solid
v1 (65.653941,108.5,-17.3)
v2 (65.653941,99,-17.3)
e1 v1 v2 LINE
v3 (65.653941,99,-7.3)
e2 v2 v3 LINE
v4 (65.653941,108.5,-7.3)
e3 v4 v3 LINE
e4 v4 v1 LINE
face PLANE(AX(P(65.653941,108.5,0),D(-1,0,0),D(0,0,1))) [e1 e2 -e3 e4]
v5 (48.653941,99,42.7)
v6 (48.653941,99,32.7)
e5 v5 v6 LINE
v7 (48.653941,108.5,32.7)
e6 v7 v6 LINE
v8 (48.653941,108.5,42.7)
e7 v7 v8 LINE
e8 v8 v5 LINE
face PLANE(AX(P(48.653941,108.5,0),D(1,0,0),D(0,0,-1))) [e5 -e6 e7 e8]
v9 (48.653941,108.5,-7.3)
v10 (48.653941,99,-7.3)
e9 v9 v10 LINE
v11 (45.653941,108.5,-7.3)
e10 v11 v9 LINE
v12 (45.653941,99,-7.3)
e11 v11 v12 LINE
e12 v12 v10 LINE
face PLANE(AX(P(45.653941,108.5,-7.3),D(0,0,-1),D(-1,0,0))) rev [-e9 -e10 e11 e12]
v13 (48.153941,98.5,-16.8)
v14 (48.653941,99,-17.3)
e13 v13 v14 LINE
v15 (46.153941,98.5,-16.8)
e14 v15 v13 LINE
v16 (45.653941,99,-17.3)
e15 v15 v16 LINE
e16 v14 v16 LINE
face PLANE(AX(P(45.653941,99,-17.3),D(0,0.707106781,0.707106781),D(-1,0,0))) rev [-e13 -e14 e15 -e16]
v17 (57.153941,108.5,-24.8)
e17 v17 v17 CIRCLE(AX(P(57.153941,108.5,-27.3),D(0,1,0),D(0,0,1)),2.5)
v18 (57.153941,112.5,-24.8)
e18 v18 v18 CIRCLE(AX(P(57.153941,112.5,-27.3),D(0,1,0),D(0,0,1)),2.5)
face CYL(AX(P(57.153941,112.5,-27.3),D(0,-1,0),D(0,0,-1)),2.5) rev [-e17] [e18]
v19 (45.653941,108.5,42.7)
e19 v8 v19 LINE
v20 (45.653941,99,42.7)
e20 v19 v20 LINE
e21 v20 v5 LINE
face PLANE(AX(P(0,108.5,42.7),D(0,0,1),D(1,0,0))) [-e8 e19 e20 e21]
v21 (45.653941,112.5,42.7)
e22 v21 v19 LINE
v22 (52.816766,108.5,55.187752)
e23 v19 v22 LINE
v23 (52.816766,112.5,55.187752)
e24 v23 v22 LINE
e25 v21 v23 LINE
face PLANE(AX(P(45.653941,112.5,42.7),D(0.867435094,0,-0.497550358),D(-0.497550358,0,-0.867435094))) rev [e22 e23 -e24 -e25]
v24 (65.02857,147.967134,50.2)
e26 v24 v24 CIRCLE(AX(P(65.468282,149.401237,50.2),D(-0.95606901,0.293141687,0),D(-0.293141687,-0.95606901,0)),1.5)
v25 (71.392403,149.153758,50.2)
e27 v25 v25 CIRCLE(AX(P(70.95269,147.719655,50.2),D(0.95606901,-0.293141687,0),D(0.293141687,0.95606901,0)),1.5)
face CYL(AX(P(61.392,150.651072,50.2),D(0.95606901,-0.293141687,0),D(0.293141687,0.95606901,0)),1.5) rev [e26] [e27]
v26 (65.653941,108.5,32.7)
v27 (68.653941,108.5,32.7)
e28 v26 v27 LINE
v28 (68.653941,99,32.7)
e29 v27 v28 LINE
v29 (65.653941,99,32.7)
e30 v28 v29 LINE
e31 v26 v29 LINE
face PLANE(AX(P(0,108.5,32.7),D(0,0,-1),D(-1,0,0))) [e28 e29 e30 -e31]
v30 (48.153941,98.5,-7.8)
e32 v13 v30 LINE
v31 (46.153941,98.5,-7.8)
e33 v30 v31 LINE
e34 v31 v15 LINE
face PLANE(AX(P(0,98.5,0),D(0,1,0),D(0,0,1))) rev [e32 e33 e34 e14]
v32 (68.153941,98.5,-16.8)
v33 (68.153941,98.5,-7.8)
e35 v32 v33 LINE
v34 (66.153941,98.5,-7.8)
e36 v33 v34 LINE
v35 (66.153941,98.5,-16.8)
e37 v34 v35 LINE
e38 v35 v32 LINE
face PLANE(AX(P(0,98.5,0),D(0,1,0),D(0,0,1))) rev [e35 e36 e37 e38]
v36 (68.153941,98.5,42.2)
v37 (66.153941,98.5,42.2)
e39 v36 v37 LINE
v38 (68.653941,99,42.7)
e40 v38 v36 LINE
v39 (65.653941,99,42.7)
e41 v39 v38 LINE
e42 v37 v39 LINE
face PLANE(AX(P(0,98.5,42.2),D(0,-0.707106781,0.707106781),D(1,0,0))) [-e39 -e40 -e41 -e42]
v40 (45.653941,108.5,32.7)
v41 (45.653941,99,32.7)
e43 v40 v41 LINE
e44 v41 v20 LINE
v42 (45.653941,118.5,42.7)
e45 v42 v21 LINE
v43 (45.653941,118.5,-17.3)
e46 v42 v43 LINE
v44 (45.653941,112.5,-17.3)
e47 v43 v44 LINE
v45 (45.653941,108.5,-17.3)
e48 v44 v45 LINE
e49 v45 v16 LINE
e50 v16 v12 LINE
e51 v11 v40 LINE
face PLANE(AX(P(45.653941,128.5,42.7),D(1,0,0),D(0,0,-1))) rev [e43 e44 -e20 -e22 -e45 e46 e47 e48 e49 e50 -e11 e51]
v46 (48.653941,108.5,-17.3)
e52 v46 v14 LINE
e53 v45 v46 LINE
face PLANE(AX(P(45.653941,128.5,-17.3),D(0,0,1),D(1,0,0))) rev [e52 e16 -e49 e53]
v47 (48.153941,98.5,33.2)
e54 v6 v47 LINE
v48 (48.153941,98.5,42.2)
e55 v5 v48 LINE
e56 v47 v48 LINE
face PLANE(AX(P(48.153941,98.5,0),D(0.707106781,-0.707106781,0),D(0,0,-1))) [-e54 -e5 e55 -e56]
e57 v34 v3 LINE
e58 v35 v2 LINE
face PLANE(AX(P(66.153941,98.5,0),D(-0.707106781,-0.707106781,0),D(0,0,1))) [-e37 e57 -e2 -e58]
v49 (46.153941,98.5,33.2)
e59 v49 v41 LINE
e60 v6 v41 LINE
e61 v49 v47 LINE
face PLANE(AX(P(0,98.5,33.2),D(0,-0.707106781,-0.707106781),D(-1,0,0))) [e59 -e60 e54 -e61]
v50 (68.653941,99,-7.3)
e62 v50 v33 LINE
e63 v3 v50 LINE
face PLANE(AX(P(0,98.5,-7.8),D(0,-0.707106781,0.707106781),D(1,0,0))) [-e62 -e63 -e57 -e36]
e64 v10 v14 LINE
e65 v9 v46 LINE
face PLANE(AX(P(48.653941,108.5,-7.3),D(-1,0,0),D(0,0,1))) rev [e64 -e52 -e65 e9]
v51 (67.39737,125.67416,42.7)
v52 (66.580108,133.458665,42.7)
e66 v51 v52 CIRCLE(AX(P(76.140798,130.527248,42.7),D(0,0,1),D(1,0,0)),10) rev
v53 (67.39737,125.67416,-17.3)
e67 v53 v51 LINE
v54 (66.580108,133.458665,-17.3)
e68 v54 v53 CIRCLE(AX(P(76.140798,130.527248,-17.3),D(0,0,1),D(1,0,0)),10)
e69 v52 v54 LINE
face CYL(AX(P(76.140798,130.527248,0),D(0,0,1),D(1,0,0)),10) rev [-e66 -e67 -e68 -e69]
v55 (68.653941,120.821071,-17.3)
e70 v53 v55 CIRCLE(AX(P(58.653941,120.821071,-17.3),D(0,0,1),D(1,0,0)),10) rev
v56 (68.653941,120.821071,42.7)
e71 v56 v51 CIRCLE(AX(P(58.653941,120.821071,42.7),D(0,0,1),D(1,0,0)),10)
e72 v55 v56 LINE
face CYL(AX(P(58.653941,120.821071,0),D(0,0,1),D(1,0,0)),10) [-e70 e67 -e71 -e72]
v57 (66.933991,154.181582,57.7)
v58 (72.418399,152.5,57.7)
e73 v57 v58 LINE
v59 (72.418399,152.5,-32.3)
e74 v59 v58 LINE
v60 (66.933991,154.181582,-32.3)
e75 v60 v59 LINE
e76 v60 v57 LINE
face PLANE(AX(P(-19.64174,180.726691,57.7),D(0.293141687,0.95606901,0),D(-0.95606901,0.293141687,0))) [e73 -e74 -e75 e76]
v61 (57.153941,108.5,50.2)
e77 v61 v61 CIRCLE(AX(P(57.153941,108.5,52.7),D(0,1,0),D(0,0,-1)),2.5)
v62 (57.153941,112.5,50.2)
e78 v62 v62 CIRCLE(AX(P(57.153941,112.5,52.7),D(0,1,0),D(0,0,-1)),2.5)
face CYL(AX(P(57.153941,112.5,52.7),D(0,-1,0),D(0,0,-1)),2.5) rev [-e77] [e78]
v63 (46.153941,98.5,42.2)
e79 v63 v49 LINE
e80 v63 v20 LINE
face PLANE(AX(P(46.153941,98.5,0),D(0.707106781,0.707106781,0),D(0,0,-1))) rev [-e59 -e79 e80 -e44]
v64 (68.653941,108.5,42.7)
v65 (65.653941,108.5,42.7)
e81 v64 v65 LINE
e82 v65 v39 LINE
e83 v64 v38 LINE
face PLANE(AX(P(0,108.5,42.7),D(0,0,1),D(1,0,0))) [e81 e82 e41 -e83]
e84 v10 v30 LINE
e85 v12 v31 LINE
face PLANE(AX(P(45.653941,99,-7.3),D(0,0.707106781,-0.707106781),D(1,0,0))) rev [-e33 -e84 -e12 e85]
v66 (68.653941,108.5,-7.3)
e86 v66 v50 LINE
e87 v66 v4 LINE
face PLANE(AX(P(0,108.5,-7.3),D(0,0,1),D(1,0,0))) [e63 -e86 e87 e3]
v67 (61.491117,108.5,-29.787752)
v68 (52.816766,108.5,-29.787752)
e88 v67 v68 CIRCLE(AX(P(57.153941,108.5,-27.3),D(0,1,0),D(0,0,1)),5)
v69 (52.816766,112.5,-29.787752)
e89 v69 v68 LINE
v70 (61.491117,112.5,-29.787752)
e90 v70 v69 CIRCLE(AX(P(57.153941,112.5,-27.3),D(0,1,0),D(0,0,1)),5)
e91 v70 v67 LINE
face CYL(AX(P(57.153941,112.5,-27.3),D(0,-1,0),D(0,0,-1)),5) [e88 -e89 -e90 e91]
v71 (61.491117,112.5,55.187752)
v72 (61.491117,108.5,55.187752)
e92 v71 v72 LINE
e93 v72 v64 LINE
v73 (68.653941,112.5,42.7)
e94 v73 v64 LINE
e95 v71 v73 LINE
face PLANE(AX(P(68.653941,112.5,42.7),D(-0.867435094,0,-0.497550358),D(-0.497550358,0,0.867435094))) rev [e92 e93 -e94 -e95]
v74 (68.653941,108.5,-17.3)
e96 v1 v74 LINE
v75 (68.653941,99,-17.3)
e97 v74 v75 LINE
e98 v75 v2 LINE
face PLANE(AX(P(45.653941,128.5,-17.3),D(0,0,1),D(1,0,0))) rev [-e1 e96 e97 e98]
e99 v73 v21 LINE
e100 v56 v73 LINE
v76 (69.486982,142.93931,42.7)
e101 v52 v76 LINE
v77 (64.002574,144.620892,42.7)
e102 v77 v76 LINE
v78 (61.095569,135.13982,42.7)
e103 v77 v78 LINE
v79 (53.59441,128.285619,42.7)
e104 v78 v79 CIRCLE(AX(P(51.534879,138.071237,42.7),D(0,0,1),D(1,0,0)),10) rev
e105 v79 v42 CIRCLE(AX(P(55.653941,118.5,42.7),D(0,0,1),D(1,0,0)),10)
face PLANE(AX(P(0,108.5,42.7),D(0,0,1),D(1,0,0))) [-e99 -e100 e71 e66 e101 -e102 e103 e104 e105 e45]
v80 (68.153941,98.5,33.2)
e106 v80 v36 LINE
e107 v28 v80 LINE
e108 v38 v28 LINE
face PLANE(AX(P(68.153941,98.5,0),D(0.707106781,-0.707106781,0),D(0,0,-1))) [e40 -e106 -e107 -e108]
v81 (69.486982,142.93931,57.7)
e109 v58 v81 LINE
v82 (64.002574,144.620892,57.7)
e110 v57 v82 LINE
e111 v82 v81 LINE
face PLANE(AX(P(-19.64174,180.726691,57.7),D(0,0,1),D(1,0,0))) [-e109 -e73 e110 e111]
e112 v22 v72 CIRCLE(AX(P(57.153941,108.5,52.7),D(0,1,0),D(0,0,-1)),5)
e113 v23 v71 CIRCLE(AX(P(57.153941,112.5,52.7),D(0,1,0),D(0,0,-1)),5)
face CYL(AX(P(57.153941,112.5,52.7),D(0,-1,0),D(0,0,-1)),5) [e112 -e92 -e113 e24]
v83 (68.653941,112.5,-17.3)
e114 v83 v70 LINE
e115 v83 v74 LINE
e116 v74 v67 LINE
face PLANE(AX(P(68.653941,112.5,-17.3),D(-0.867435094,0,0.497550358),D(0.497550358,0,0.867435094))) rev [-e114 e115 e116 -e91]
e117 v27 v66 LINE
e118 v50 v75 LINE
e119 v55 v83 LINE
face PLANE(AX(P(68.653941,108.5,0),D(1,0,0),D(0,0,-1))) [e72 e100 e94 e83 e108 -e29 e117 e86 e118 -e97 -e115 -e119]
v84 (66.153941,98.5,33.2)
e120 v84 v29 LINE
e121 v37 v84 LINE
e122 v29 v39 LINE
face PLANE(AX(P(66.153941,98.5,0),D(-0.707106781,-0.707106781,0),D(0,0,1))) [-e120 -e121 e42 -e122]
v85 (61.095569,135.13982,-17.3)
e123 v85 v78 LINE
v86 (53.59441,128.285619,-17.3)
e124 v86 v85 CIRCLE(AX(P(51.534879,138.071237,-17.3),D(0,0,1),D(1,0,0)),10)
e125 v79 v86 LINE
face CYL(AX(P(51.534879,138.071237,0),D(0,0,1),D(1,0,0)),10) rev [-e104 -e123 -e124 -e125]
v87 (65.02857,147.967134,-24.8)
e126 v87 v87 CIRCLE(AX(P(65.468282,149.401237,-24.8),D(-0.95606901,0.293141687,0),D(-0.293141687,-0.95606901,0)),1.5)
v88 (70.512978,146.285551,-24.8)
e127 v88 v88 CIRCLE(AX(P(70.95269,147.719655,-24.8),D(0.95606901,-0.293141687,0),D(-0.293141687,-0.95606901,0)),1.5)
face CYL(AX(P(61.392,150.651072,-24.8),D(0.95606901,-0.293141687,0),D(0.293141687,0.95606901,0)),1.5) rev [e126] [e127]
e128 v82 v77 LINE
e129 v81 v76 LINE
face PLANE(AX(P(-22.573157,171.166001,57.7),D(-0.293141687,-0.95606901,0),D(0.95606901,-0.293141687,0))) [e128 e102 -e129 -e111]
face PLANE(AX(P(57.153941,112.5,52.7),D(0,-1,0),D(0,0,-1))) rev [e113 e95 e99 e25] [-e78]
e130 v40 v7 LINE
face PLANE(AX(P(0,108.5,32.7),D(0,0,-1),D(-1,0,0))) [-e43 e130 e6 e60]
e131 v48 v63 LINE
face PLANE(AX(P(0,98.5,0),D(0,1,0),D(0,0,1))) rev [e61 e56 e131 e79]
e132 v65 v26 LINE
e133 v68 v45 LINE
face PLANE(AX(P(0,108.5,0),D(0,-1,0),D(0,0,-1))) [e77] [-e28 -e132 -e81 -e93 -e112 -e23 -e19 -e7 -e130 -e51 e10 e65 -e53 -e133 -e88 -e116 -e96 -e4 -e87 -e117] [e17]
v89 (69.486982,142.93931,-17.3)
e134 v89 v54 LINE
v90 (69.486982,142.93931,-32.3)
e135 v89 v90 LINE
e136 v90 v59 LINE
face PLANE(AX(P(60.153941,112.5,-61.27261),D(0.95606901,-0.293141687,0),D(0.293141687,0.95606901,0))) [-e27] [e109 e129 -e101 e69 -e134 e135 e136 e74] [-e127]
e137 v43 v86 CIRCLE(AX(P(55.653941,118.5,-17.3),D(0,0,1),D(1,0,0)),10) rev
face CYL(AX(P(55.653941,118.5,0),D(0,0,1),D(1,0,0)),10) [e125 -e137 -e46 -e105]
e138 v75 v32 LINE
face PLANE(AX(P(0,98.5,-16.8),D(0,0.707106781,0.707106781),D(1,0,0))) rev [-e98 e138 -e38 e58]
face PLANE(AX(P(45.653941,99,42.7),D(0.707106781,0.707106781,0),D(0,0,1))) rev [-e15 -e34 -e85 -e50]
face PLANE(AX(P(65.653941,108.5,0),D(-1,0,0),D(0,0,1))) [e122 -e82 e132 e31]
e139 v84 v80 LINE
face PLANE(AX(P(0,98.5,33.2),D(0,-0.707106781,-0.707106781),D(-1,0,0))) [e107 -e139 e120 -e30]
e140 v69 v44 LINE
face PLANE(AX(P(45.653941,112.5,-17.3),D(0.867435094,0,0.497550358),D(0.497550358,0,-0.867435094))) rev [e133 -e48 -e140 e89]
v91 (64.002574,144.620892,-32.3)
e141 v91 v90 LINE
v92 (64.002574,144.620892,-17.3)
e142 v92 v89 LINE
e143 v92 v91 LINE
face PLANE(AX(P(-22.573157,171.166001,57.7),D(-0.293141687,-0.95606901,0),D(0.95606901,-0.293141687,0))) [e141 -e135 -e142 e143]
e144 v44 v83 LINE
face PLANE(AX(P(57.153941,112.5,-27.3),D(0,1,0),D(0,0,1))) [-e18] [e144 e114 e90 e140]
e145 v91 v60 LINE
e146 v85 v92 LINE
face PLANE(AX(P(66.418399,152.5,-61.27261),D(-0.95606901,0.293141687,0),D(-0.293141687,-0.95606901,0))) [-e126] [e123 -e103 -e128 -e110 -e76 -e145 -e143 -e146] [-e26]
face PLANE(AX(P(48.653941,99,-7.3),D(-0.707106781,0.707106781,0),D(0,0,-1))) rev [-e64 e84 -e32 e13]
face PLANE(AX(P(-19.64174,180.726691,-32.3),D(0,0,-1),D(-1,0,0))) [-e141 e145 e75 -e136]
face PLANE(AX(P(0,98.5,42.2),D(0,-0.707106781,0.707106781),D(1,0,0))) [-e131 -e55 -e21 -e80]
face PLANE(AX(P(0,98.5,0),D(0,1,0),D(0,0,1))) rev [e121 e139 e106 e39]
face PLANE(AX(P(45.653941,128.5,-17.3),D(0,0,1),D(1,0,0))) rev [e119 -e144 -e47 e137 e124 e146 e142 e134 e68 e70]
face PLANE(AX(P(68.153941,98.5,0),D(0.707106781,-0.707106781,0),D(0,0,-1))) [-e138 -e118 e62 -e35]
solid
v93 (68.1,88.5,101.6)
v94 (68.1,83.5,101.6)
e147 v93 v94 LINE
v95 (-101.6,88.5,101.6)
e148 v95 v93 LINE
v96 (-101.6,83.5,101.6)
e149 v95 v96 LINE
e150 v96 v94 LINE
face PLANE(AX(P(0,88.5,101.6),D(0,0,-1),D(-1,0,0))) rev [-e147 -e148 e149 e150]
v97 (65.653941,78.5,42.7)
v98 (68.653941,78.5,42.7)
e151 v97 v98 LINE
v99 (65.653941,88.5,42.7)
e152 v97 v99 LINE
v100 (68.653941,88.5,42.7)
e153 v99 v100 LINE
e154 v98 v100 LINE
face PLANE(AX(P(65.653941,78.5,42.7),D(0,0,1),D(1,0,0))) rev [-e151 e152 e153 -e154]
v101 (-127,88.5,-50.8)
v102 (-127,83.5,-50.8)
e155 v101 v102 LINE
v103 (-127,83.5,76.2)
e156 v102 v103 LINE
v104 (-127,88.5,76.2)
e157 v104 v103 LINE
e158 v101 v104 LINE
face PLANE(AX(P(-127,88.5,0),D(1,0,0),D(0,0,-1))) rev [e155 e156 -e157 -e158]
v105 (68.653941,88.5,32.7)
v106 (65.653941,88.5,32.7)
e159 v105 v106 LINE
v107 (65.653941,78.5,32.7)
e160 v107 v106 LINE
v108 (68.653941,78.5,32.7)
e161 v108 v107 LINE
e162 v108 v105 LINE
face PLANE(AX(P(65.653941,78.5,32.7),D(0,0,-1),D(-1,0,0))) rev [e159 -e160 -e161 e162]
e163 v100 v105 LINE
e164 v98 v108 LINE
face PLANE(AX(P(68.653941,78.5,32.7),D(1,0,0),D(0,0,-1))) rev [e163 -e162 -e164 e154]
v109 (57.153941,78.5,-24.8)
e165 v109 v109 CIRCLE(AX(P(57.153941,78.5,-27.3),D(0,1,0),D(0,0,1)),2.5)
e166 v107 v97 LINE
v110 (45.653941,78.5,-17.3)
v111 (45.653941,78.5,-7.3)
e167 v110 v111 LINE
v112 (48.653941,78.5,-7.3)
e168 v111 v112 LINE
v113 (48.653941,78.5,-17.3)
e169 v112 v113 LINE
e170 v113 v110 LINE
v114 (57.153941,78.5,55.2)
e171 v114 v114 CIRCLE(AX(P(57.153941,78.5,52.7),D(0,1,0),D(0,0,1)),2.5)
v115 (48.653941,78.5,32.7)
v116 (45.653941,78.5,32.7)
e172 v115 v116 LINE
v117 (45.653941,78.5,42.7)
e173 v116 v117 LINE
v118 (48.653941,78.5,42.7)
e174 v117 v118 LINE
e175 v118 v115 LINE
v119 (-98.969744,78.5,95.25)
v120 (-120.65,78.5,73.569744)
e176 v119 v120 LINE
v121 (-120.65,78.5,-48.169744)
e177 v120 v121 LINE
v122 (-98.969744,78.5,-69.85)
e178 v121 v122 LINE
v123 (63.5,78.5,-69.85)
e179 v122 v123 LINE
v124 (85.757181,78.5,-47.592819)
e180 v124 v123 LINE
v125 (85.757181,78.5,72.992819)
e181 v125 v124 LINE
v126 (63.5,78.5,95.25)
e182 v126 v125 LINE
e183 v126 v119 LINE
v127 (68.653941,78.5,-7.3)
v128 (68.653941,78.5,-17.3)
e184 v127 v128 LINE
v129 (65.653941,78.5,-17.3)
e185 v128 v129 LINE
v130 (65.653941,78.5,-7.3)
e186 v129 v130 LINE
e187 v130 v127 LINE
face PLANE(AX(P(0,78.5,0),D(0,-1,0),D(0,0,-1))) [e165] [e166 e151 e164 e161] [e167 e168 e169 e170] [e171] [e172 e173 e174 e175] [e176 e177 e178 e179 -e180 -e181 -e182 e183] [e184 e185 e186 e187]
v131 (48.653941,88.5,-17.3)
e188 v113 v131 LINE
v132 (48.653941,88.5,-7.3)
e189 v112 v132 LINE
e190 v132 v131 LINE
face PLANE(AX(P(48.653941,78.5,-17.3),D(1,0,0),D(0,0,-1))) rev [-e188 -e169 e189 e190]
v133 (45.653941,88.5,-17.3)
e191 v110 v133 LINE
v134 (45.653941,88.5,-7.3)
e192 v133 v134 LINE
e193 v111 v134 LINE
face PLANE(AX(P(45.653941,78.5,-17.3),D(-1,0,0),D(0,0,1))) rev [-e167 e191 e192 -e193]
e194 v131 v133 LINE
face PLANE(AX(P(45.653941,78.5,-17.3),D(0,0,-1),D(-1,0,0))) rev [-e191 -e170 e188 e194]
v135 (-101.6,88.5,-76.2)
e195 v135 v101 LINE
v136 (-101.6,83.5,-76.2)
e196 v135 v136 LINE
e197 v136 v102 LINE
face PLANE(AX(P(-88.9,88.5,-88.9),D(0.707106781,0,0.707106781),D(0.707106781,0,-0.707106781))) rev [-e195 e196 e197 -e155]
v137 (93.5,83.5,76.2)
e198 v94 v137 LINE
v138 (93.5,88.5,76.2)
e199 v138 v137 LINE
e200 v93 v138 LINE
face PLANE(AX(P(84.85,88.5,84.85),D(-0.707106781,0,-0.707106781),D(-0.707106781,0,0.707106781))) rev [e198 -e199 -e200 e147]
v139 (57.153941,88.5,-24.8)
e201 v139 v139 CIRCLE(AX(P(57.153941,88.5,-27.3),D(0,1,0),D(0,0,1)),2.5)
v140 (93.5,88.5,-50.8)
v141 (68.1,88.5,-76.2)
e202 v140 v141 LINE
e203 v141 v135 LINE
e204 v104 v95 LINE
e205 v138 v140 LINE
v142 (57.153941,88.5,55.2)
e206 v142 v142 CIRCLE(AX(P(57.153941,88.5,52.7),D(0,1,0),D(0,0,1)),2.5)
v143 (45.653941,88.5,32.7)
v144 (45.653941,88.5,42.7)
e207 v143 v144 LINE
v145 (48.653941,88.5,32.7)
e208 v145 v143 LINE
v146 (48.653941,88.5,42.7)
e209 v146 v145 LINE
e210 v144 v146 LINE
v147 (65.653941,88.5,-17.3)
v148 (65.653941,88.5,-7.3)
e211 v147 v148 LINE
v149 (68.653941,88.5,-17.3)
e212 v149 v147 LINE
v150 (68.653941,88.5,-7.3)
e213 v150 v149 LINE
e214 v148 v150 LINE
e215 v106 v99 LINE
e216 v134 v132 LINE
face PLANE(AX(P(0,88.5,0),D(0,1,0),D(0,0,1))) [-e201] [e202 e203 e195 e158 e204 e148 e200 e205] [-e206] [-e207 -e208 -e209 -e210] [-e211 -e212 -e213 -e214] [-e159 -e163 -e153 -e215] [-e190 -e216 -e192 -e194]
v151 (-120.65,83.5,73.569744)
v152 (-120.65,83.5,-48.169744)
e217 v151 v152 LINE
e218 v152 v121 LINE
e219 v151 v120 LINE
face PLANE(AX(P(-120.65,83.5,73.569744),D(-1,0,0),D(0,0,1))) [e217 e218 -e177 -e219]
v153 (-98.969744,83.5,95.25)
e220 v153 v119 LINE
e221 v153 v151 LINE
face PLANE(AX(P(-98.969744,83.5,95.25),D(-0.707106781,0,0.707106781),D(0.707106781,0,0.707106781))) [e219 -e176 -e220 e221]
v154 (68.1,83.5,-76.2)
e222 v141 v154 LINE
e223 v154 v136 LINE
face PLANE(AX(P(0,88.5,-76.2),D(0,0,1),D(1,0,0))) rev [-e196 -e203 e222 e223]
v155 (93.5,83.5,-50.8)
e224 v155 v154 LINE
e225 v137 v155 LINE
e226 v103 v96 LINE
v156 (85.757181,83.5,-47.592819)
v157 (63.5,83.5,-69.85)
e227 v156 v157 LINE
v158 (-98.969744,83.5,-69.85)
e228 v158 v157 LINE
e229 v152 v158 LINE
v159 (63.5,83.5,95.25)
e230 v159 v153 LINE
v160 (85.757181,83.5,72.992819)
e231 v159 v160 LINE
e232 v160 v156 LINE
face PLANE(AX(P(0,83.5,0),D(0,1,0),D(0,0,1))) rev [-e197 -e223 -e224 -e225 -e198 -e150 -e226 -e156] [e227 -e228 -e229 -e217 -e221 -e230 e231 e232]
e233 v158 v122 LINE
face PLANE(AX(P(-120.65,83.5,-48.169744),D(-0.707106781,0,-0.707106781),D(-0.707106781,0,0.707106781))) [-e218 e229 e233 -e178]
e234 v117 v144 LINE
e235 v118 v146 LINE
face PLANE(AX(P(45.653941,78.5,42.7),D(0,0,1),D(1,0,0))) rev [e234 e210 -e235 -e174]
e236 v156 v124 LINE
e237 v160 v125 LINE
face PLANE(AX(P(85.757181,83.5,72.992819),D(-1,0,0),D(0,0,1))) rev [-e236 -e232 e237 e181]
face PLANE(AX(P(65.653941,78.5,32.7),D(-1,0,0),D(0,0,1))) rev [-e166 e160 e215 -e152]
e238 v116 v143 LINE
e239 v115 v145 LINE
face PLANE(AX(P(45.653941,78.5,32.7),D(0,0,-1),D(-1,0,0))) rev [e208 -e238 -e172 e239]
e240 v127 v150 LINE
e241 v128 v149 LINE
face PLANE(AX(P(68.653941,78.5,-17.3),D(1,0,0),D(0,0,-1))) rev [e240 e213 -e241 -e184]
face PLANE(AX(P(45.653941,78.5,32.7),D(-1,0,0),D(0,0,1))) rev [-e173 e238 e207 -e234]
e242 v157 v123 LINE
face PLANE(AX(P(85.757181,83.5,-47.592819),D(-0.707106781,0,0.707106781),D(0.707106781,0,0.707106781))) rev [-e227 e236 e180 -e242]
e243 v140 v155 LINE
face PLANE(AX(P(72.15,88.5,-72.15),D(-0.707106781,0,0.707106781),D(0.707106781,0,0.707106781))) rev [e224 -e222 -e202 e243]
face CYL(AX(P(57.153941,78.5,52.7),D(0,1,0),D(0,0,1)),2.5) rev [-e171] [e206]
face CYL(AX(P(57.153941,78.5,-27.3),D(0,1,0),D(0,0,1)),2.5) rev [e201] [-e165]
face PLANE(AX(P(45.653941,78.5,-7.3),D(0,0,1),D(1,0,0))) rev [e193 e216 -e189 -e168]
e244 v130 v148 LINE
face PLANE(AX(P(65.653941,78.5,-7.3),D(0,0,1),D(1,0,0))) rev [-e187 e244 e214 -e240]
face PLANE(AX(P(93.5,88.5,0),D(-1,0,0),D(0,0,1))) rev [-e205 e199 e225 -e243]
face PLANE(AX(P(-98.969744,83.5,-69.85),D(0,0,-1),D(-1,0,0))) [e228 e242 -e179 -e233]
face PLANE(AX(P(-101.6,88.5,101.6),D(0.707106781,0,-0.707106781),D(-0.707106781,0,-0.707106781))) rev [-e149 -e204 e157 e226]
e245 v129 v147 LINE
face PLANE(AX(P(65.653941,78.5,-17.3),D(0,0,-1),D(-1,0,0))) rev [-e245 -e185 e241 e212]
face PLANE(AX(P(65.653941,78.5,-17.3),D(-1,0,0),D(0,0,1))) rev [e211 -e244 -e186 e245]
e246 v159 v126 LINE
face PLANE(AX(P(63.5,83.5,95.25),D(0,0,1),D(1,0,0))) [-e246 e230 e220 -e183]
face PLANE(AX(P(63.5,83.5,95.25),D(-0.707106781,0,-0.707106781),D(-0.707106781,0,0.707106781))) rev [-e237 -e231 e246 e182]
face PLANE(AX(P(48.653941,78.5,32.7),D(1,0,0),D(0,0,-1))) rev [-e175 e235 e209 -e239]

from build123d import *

# Parameters (mm, degrees)
SKETCH2_W               = 190.5
SKETCH2_H               = 177.8
BOSS_EXTRUDE1_DEPTH     = 5.08
CHAMFER1_SIZE           = 25.4
BOSS_EXTRUDE3_DEPTH     = 68.42
SKETCH5_R               = 9
SKETCH5_R_2             = 1.5
CUT_EXTRUDE1_DEPTH      = 231.530019737
SKETCH10_W              = 177.8
SKETCH10_H              = 73.5
BOSS_EXTRUDE6_DEPTH     = 30
CHAMFER3_SIZE           = 25.4
CUT_EXTRUDE2_DEPTH      = 68.42
BOSS_EXTRUDE7_START     = 38.1
BOSS_EXTRUDE7_DEPTH     = 10
SKETCH13_W              = 15.24
SKETCH13_H              = 10
BOSS_EXTRUDE8_DEPTH     = 7
SKETCH14_R              = 2.5
CUT_EXTRUDE3_DEPTH      = 10
MIRROR4_COPY_1_SKETCH_W = 15.24
MIRROR4_COPY_1_SKETCH_H = 10
MIRROR4_COPY_1_DEPTH    = 7
MIRROR4_COPY_2_SKETCH_R = 2.5
MIRROR4_COPY_2_DEPTH    = 10
BOSS_EXTRUDE9_START     = 5
BOSS_EXTRUDE9_DEPTH     = 5
BOSS_EXTRUDE10_START    = 10
BOSS_EXTRUDE10_DEPTH    = 5
SKETCH16_R              = 2.5
CUT_EXTRUDE4_DEPTH      = 163.946494286
SKETCH17_W              = 3
SKETCH17_H              = 10
CUT_EXTRUDE5_DEPTH      = 163.946494286
BOSS_EXTRUDE11_START    = 10
SKETCH18_W              = 3
SKETCH18_H              = 10
BOSS_EXTRUDE11_DEPTH    = 10
BOSS_EXTRUDE11_2_DEPTH  = 10
BOSS_EXTRUDE11_3_DEPTH  = 10
BOSS_EXTRUDE11_4_DEPTH  = 10
SKETCH19_W              = 23
SKETCH19_H              = 60
BOSS_EXTRUDE12_DEPTH    = 20
BOSS_EXTRUDE13_START    = -20
SKETCH20_R              = 2.5
BOSS_EXTRUDE13_DEPTH    = 4
BOSS_EXTRUDE16_DEPTH    = 60
FILLET1_R               = 10
SKETCH24_W              = 90
SKETCH24_H              = 10
BOSS_EXTRUDE17_DEPTH    = 5.736414059
SKETCH25_R              = 1.5
CUT_EXTRUDE7_DEPTH      = 10
FILLET2_R               = 10
FILLET3_R               = 10
FILLET4_R               = 10
CHAMFER4_SIZE           = 0.5


with BuildPart() as part:
    # Sketch2 → Boss-Extrude1 (new body)
    with BuildSketch(Plane(origin=(0, 0, 0), x_dir=(1, 0, 0), z_dir=(0, 1, 0))):
        with Locations((-31.75, -12.7)):
            Rectangle(SKETCH2_W, SKETCH2_H)
    extrude(amount=BOSS_EXTRUDE1_DEPTH)

    # Chamfer1
    chamfer1_edges = [part.edges().sort_by_distance(p)[0] for p in [
        (-127, 2.54, -76.2),
        (-127, 2.54, 101.6),
    ]]
    chamfer(chamfer1_edges, length=CHAMFER1_SIZE)

    # Sketch4 → Boss-Extrude3 (add)
    with BuildSketch(Plane(origin=(0, 5.08, 0), x_dir=(1, 0, 0), z_dir=(0, 1, 0))):
        Polygon((57.15, 69.85), (-98.969743879, 69.85), (-120.65, 48.169743879), (-120.65, -73.569743879), (-98.969743879, -95.25), (57.15, -95.25), (63.5, -95.25), (63.5, -101.6), (-101.6, -101.6), (-127, -76.2), (-127, 50.8), (-101.6, 76.2), (63.5, 76.2), (63.5, 69.85), align=None)
    extrude(amount=BOSS_EXTRUDE3_DEPTH)

    # Sketch5 → Cut-Extrude1 (cut, through all)
    with BuildSketch(Plane.XY.offset(101.6)):
        with Locations((-50.8, 31.75)):
            Circle(SKETCH5_R)
        with Locations((-50.8, 47.25)):
            Circle(SKETCH5_R_2)
        with Locations((-37.376606241, 39.5)):
            Circle(SKETCH5_R_2)
        with Locations((-37.376606241, 24)):
            Circle(SKETCH5_R_2)
        with Locations((-50.8, 16.25)):
            Circle(SKETCH5_R_2)
        with Locations((-64.223393759, 24)):
            Circle(SKETCH5_R_2)
        with Locations((-64.223393759, 39.5)):
            Circle(SKETCH5_R_2)
    extrude(amount=-CUT_EXTRUDE1_DEPTH, mode=Mode.SUBTRACT)

    # Sketch10 → Boss-Extrude6 (add)
    with BuildSketch(Plane(origin=(63.5, 0, 0), x_dir=(0, 0, -1), z_dir=(1, 0, 0))):
        with Locations((-12.7, 36.75)):
            Rectangle(SKETCH10_W, SKETCH10_H)
    extrude(amount=BOSS_EXTRUDE6_DEPTH)

    # Chamfer3
    chamfer3_edges = [part.edges().sort_by_distance(p)[0] for p in [
        (93.5, 36.75, 101.6),
        (93.5, 36.75, -76.2),
    ]]
    chamfer(chamfer3_edges, length=CHAMFER3_SIZE)

    # Sketch11 → Cut-Extrude2 (cut)
    with BuildSketch(Plane(origin=(0, 73.5, 0), x_dir=(1, 0, 0), z_dir=(0, 1, 0))):
        Polygon((85.757180746, -72.992819254), (85.757180746, 47.592819254), (63.5, 69.85), (63.5, -95.25), align=None)
    extrude(amount=-CUT_EXTRUDE2_DEPTH, mode=Mode.SUBTRACT)

    # Sketch12 → Boss-Extrude7 (add)
    with BuildSketch(Plane(origin=(0, 0, 95.25), x_dir=(-1, 0, 0), z_dir=(0, 0, -1)).offset(BOSS_EXTRUDE7_START)):
        with BuildLine():
            Line((25.8, 5.08), (75.8, 5.08))
            Line((75.8, 5.08), (75.8, 31.75))
            Line((75.8, 31.75), (69.8, 31.75))
            ThreePointArc((69.8, 31.75), (50.8, 12.75), (31.8, 31.75))
            Line((31.8, 31.75), (25.8, 31.75))
            Line((25.8, 31.75), (25.8, 5.08))
        make_face()
    boss_extrude7 = extrude(amount=BOSS_EXTRUDE7_DEPTH)

    # Sketch13 → Boss-Extrude8 (add)
    with BuildSketch(Plane(origin=(0, 31.75, 0), x_dir=(1, 0, 0), z_dir=(0, 1, 0))):
        with Locations((-24.18, -52.15)):
            Rectangle(SKETCH13_W, SKETCH13_H)
    boss_extrude8 = extrude(amount=-BOSS_EXTRUDE8_DEPTH)

    # Sketch14 → Cut-Extrude3 (cut)
    with BuildSketch(Plane(origin=(0, 31.75, 0), x_dir=(1, 0, 0), z_dir=(0, 1, 0))):
        with Locations(Location((-20.37, -52.15, 0), (0, 0, 270))):
            Circle(SKETCH14_R)
    cut_extrude3 = extrude(amount=-CUT_EXTRUDE3_DEPTH, mode=Mode.SUBTRACT)

    # Mirror2: Boss-Extrude8 across plane
    add(boss_extrude8.mirror(Plane.ZY.offset(50.8)))

    # Mirror3: Cut-Extrude3 across plane
    add(cut_extrude3.mirror(Plane.ZY.offset(50.8)), mode=Mode.SUBTRACT)

    # Mirror4: Boss-Extrude7, Boss-Extrude8, Cut-Extrude3 across plane
    add(boss_extrude7.mirror(Plane.XY.offset(12.7)))
    add(boss_extrude8.mirror(Plane.XY.offset(12.7)))
    add(cut_extrude3.mirror(Plane.XY.offset(12.7)), mode=Mode.SUBTRACT)

    # Mirror4 copy 1 sketch → Mirror4 copy 1 (add)
    with BuildSketch(Plane(origin=(-101.6, 31.75, 25.4), x_dir=(-1, 0, 0), z_dir=(0, 1, 0))):
        with Locations((-24.18, -52.15)):
            Rectangle(MIRROR4_COPY_1_SKETCH_W, MIRROR4_COPY_1_SKETCH_H)
    extrude(amount=-MIRROR4_COPY_1_DEPTH)

    # Mirror4 copy 2 sketch → Mirror4 copy 2 (cut)
    with BuildSketch(Plane(origin=(-101.6, 31.75, 25.4), x_dir=(-1, 0, 0), z_dir=(0, 1, 0))):
        with Locations(Location((-20.37, -52.15, 0), (0, 0, 270))):
            Circle(MIRROR4_COPY_2_SKETCH_R)
    extrude(amount=-MIRROR4_COPY_2_DEPTH, mode=Mode.SUBTRACT)


with BuildPart() as body_2:
    # Sketch15 → Boss-Extrude9 (new body)
    with BuildSketch(Plane(origin=(0, 73.5, 0), x_dir=(1, 0, 0), z_dir=(0, 1, 0)).offset(BOSS_EXTRUDE9_START)):
        Polygon((85.757180746, 47.592819254), (63.5, 69.85), (-98.969743879, 69.85), (-120.65, 48.169743879), (-120.65, -73.569743879), (-98.969743879, -95.25), (63.5, -95.25), (85.757180746, -72.992819254), align=None)
    extrude(amount=BOSS_EXTRUDE9_DEPTH)

    # Sketch15<3> → Boss-Extrude10 (add)
    with BuildSketch(Plane(origin=(0, 73.5, 0), x_dir=(1, 0, 0), z_dir=(0, 1, 0)).offset(BOSS_EXTRUDE10_START)):
        Polygon((93.5, -76.2), (93.5, 50.8), (68.1, 76.2), (-101.6, 76.2), (-127, 50.8), (-127, -76.2), (-101.6, -101.6), (68.1, -101.6), align=None)
    extrude(amount=BOSS_EXTRUDE10_DEPTH)

    # Sketch16 → Cut-Extrude4 (cut, through all)
    with BuildSketch(Plane(origin=(0, 88.5, 0), x_dir=(1, 0, 0), z_dir=(0, 1, 0))):
        with Locations(Location((57.153941403, 27.3, 0), (0, 0, 270))):
            Circle(SKETCH16_R)
        with Locations(Location((57.153941403, -52.7, 0), (0, 0, 270))):
            Circle(SKETCH16_R)
    extrude(amount=-CUT_EXTRUDE4_DEPTH, mode=Mode.SUBTRACT)

    # Sketch17 → Cut-Extrude5 (cut, through all)
    with BuildSketch(Plane(origin=(0, 88.5, 0), x_dir=(1, 0, 0), z_dir=(0, 1, 0))):
        with Locations((47.153941403, 12.3)):
            Rectangle(SKETCH17_W, SKETCH17_H)
        with Locations((67.153941403, 12.3)):
            Rectangle(SKETCH17_W, SKETCH17_H)
        with Locations((47.153941403, -37.7)):
            Rectangle(SKETCH17_W, SKETCH17_H)
        with Locations((67.153941403, -37.7)):
            Rectangle(SKETCH17_W, SKETCH17_H)
    extrude(amount=-CUT_EXTRUDE5_DEPTH, mode=Mode.SUBTRACT)


with BuildPart() as body_2_2:
    # Sketch18 → Boss-Extrude11 (new body)
    with BuildSketch(Plane(origin=(0, 88.5, 0), x_dir=(1, 0, 0), z_dir=(0, 1, 0)).offset(BOSS_EXTRUDE11_START)):
        with Locations((67.153941403, -37.7)):
            Rectangle(SKETCH18_W, SKETCH18_H)
    extrude(amount=BOSS_EXTRUDE11_DEPTH)



with BuildPart() as body_3:
    # Sketch18 → Boss-Extrude11 2 (new body)
    with BuildSketch(Plane(origin=(0, 88.5, 0), x_dir=(1, 0, 0), z_dir=(0, 1, 0)).offset(BOSS_EXTRUDE11_START)):
        with Locations((47.153941403, -37.7)):
            Rectangle(SKETCH18_W, SKETCH18_H)
    extrude(amount=BOSS_EXTRUDE11_2_DEPTH)


with BuildPart() as body_4:
    # Sketch18 → Boss-Extrude11 3 (new body)
    with BuildSketch(Plane(origin=(0, 88.5, 0), x_dir=(1, 0, 0), z_dir=(0, 1, 0)).offset(BOSS_EXTRUDE11_START)):
        with Locations((47.153941403, 12.3)):
            Rectangle(SKETCH18_W, SKETCH18_H)
    extrude(amount=BOSS_EXTRUDE11_3_DEPTH)


with BuildPart() as body_5:
    # Sketch18 → Boss-Extrude11 4 (new body)
    with BuildSketch(Plane(origin=(0, 88.5, 0), x_dir=(1, 0, 0), z_dir=(0, 1, 0)).offset(BOSS_EXTRUDE11_START)):
        with Locations((67.153941403, 12.3)):
            Rectangle(SKETCH18_W, SKETCH18_H)
    extrude(amount=BOSS_EXTRUDE11_4_DEPTH)


with BuildPart() as body_2_2_1:
    add(body_2_2.part)

    add(body_3.part)  # Boss-Extrude12 merges body 3

    add(body_4.part)  # Boss-Extrude12 merges body 4

    add(body_5.part)  # Boss-Extrude12 merges body 5
    # Sketch19 → Boss-Extrude12 (add)
    with BuildSketch(Plane(origin=(0, 108.5, 0), x_dir=(1, 0, 0), z_dir=(0, 1, 0))):
        with Locations((57.153941403, -12.7)):
            Rectangle(SKETCH19_W, SKETCH19_H)
    extrude(amount=BOSS_EXTRUDE12_DEPTH)

    # Sketch20 → Boss-Extrude13 (add)
    # profile 1 of 2: a face of its own
    with BuildSketch(Plane(origin=(0, 128.5, 0), x_dir=(1, 0, 0), z_dir=(0, 1, 0)).offset(BOSS_EXTRUDE13_START)):
        with BuildLine():
            Line((45.653941403, 17.3), (52.816765935, 29.787751788))
            ThreePointArc((52.816765935, 29.787751788), (57.153941403, 32.3), (61.491116871, 29.787751788))
            Line((61.491116871, 29.787751788), (68.653941403, 17.3))
            Line((68.653941403, 17.3), (45.653941403, 17.3))
        make_face()
        with Locations(Location((57.153941403, 27.3, 0), (0, 0, 270))):
            Circle(SKETCH20_R, mode=Mode.SUBTRACT)
    # profile 2 of 2: a face of its own
    with BuildSketch(Plane(origin=(0, 128.5, 0), x_dir=(1, 0, 0), z_dir=(0, 1, 0)).offset(BOSS_EXTRUDE13_START)):
        with BuildLine():
            Line((68.653941403, -42.7), (61.491116871, -55.187751788))
            ThreePointArc((61.491116871, -55.187751788), (57.153941403, -57.7), (52.816765935, -55.187751788))
            Line((52.816765935, -55.187751788), (45.653941403, -42.7))
            Line((45.653941403, -42.7), (68.653941403, -42.7))
        make_face()
        with Locations(Location((57.153941403, -52.7, 0), (0, 0, 90))):
            Circle(SKETCH20_R, mode=Mode.SUBTRACT)
    extrude(amount=BOSS_EXTRUDE13_DEPTH)

    # Sketch23 → Boss-Extrude16 (add)
    with BuildSketch(Plane.XY.offset(42.7)):
        Polygon((60.153941403, 112.5), (72.418398612, 152.5), (66.418398612, 152.5), (54.153941403, 112.5), align=None)
    extrude(amount=-BOSS_EXTRUDE16_DEPTH)

    # Fillet1
    # the kernel refuses this fillet: 10 mm, written as the material it takes off along each edge
    with BuildSketch(Plane(origin=(68.653941403, 128.5, 61.897321696), x_dir=(-1, 0, 0), z_dir=(0, 0, -1))) as fillet1_piece_1:
        with BuildLine():
            CenterArc((10, -7.678928678), FILLET1_R, 129.834954534, 50.165045466)
            Line((0, -7.678928678), (-0.2, -7.678928678))
            Line((-0.2, -7.678928678), (-0.2, 0))
            Line((-0.2, 0), (0, 0.2))
            ThreePointArc((0, 0.2), (1.797108558, 0.2), (3.466101459, 0.153578574))
            Line((3.466101459, 0.153578574), (3.594217116, 0))
        make_face()
    extrude(amount=98.394643391, mode=Mode.SUBTRACT)

    # Sketch24 → Boss-Extrude17 (add)
    with BuildSketch(Plane(origin=(23.455125777, -7.191609661, 0), x_dir=(0, 0, -1), z_dir=(0.9560690098650367, -0.2931416865198267, 0))):
        with Locations((-12.7, 162.029375509)):
            Rectangle(SKETCH24_W, SKETCH24_H)
    extrude(amount=-BOSS_EXTRUDE17_DEPTH)

    # Sketch25 → Cut-Extrude7 (cut)
    with BuildSketch(Plane(origin=(23.455125777, -7.191609661, 0), x_dir=(0, 0, -1), z_dir=(0.9560690098650367, -0.2931416865198267, 0))):
        with Locations(Location((-50.2, 162.029375509, 0), (0, 0, 90))):
            Circle(SKETCH25_R)
        with Locations(Location((24.8, 162.029375509, 0), (0, 0, 270))):
            Circle(SKETCH25_R)
    extrude(amount=-CUT_EXTRUDE7_DEPTH, mode=Mode.SUBTRACT)

    # Fillet2
    fillet2_edges = [body_2_2_1.edges().sort_by_distance(p)[0] for p in [
        (45.653941403, 128.5, 12.7),
    ]]
    fillet(fillet2_edges, radius=FILLET2_R)

    # Fillet3
    fillet3_edges = [body_2_2_1.edges().sort_by_distance(p)[0] for p in [
        (65.059724287, 128.5, 12.7),
    ]]
    fillet(fillet3_edges, radius=FILLET3_R)

    # Fillet4
    fillet4_edges = [body_2_2_1.edges().sort_by_distance(p)[0] for p in [
        (59.059724287, 128.5, 12.7),
    ]]
    fillet(fillet4_edges, radius=FILLET4_R)

    # Chamfer4
    chamfer4_edges = [body_2_2_1.edges().sort_by_distance(p)[0] for p in [
        (67.153941403, 98.5, 42.7),
        (68.653941403, 98.5, -12.3),
        (67.153941403, 98.5, -7.3),
        (65.653941403, 98.5, -12.3),
        (67.153941403, 98.5, -17.3),
        (65.653941403, 98.5, 37.7),
        (67.153941403, 98.5, 32.7),
        (48.653941403, 98.5, 37.7),
        (47.153941403, 98.5, 42.7),
        (45.653941403, 98.5, 37.7),
        (47.153941403, 98.5, 32.7),
        (68.653941403, 98.5, 37.7),
        (47.153941403, 98.5, -7.3),
        (48.653941403, 98.5, -12.3),
        (47.153941403, 98.5, -17.3),
        (45.653941403, 98.5, -12.3),
    ]]
    chamfer(chamfer4_edges, length=CHAMFER4_SIZE)


solid = Compound([body_2.part, body_2_2_1.part])
